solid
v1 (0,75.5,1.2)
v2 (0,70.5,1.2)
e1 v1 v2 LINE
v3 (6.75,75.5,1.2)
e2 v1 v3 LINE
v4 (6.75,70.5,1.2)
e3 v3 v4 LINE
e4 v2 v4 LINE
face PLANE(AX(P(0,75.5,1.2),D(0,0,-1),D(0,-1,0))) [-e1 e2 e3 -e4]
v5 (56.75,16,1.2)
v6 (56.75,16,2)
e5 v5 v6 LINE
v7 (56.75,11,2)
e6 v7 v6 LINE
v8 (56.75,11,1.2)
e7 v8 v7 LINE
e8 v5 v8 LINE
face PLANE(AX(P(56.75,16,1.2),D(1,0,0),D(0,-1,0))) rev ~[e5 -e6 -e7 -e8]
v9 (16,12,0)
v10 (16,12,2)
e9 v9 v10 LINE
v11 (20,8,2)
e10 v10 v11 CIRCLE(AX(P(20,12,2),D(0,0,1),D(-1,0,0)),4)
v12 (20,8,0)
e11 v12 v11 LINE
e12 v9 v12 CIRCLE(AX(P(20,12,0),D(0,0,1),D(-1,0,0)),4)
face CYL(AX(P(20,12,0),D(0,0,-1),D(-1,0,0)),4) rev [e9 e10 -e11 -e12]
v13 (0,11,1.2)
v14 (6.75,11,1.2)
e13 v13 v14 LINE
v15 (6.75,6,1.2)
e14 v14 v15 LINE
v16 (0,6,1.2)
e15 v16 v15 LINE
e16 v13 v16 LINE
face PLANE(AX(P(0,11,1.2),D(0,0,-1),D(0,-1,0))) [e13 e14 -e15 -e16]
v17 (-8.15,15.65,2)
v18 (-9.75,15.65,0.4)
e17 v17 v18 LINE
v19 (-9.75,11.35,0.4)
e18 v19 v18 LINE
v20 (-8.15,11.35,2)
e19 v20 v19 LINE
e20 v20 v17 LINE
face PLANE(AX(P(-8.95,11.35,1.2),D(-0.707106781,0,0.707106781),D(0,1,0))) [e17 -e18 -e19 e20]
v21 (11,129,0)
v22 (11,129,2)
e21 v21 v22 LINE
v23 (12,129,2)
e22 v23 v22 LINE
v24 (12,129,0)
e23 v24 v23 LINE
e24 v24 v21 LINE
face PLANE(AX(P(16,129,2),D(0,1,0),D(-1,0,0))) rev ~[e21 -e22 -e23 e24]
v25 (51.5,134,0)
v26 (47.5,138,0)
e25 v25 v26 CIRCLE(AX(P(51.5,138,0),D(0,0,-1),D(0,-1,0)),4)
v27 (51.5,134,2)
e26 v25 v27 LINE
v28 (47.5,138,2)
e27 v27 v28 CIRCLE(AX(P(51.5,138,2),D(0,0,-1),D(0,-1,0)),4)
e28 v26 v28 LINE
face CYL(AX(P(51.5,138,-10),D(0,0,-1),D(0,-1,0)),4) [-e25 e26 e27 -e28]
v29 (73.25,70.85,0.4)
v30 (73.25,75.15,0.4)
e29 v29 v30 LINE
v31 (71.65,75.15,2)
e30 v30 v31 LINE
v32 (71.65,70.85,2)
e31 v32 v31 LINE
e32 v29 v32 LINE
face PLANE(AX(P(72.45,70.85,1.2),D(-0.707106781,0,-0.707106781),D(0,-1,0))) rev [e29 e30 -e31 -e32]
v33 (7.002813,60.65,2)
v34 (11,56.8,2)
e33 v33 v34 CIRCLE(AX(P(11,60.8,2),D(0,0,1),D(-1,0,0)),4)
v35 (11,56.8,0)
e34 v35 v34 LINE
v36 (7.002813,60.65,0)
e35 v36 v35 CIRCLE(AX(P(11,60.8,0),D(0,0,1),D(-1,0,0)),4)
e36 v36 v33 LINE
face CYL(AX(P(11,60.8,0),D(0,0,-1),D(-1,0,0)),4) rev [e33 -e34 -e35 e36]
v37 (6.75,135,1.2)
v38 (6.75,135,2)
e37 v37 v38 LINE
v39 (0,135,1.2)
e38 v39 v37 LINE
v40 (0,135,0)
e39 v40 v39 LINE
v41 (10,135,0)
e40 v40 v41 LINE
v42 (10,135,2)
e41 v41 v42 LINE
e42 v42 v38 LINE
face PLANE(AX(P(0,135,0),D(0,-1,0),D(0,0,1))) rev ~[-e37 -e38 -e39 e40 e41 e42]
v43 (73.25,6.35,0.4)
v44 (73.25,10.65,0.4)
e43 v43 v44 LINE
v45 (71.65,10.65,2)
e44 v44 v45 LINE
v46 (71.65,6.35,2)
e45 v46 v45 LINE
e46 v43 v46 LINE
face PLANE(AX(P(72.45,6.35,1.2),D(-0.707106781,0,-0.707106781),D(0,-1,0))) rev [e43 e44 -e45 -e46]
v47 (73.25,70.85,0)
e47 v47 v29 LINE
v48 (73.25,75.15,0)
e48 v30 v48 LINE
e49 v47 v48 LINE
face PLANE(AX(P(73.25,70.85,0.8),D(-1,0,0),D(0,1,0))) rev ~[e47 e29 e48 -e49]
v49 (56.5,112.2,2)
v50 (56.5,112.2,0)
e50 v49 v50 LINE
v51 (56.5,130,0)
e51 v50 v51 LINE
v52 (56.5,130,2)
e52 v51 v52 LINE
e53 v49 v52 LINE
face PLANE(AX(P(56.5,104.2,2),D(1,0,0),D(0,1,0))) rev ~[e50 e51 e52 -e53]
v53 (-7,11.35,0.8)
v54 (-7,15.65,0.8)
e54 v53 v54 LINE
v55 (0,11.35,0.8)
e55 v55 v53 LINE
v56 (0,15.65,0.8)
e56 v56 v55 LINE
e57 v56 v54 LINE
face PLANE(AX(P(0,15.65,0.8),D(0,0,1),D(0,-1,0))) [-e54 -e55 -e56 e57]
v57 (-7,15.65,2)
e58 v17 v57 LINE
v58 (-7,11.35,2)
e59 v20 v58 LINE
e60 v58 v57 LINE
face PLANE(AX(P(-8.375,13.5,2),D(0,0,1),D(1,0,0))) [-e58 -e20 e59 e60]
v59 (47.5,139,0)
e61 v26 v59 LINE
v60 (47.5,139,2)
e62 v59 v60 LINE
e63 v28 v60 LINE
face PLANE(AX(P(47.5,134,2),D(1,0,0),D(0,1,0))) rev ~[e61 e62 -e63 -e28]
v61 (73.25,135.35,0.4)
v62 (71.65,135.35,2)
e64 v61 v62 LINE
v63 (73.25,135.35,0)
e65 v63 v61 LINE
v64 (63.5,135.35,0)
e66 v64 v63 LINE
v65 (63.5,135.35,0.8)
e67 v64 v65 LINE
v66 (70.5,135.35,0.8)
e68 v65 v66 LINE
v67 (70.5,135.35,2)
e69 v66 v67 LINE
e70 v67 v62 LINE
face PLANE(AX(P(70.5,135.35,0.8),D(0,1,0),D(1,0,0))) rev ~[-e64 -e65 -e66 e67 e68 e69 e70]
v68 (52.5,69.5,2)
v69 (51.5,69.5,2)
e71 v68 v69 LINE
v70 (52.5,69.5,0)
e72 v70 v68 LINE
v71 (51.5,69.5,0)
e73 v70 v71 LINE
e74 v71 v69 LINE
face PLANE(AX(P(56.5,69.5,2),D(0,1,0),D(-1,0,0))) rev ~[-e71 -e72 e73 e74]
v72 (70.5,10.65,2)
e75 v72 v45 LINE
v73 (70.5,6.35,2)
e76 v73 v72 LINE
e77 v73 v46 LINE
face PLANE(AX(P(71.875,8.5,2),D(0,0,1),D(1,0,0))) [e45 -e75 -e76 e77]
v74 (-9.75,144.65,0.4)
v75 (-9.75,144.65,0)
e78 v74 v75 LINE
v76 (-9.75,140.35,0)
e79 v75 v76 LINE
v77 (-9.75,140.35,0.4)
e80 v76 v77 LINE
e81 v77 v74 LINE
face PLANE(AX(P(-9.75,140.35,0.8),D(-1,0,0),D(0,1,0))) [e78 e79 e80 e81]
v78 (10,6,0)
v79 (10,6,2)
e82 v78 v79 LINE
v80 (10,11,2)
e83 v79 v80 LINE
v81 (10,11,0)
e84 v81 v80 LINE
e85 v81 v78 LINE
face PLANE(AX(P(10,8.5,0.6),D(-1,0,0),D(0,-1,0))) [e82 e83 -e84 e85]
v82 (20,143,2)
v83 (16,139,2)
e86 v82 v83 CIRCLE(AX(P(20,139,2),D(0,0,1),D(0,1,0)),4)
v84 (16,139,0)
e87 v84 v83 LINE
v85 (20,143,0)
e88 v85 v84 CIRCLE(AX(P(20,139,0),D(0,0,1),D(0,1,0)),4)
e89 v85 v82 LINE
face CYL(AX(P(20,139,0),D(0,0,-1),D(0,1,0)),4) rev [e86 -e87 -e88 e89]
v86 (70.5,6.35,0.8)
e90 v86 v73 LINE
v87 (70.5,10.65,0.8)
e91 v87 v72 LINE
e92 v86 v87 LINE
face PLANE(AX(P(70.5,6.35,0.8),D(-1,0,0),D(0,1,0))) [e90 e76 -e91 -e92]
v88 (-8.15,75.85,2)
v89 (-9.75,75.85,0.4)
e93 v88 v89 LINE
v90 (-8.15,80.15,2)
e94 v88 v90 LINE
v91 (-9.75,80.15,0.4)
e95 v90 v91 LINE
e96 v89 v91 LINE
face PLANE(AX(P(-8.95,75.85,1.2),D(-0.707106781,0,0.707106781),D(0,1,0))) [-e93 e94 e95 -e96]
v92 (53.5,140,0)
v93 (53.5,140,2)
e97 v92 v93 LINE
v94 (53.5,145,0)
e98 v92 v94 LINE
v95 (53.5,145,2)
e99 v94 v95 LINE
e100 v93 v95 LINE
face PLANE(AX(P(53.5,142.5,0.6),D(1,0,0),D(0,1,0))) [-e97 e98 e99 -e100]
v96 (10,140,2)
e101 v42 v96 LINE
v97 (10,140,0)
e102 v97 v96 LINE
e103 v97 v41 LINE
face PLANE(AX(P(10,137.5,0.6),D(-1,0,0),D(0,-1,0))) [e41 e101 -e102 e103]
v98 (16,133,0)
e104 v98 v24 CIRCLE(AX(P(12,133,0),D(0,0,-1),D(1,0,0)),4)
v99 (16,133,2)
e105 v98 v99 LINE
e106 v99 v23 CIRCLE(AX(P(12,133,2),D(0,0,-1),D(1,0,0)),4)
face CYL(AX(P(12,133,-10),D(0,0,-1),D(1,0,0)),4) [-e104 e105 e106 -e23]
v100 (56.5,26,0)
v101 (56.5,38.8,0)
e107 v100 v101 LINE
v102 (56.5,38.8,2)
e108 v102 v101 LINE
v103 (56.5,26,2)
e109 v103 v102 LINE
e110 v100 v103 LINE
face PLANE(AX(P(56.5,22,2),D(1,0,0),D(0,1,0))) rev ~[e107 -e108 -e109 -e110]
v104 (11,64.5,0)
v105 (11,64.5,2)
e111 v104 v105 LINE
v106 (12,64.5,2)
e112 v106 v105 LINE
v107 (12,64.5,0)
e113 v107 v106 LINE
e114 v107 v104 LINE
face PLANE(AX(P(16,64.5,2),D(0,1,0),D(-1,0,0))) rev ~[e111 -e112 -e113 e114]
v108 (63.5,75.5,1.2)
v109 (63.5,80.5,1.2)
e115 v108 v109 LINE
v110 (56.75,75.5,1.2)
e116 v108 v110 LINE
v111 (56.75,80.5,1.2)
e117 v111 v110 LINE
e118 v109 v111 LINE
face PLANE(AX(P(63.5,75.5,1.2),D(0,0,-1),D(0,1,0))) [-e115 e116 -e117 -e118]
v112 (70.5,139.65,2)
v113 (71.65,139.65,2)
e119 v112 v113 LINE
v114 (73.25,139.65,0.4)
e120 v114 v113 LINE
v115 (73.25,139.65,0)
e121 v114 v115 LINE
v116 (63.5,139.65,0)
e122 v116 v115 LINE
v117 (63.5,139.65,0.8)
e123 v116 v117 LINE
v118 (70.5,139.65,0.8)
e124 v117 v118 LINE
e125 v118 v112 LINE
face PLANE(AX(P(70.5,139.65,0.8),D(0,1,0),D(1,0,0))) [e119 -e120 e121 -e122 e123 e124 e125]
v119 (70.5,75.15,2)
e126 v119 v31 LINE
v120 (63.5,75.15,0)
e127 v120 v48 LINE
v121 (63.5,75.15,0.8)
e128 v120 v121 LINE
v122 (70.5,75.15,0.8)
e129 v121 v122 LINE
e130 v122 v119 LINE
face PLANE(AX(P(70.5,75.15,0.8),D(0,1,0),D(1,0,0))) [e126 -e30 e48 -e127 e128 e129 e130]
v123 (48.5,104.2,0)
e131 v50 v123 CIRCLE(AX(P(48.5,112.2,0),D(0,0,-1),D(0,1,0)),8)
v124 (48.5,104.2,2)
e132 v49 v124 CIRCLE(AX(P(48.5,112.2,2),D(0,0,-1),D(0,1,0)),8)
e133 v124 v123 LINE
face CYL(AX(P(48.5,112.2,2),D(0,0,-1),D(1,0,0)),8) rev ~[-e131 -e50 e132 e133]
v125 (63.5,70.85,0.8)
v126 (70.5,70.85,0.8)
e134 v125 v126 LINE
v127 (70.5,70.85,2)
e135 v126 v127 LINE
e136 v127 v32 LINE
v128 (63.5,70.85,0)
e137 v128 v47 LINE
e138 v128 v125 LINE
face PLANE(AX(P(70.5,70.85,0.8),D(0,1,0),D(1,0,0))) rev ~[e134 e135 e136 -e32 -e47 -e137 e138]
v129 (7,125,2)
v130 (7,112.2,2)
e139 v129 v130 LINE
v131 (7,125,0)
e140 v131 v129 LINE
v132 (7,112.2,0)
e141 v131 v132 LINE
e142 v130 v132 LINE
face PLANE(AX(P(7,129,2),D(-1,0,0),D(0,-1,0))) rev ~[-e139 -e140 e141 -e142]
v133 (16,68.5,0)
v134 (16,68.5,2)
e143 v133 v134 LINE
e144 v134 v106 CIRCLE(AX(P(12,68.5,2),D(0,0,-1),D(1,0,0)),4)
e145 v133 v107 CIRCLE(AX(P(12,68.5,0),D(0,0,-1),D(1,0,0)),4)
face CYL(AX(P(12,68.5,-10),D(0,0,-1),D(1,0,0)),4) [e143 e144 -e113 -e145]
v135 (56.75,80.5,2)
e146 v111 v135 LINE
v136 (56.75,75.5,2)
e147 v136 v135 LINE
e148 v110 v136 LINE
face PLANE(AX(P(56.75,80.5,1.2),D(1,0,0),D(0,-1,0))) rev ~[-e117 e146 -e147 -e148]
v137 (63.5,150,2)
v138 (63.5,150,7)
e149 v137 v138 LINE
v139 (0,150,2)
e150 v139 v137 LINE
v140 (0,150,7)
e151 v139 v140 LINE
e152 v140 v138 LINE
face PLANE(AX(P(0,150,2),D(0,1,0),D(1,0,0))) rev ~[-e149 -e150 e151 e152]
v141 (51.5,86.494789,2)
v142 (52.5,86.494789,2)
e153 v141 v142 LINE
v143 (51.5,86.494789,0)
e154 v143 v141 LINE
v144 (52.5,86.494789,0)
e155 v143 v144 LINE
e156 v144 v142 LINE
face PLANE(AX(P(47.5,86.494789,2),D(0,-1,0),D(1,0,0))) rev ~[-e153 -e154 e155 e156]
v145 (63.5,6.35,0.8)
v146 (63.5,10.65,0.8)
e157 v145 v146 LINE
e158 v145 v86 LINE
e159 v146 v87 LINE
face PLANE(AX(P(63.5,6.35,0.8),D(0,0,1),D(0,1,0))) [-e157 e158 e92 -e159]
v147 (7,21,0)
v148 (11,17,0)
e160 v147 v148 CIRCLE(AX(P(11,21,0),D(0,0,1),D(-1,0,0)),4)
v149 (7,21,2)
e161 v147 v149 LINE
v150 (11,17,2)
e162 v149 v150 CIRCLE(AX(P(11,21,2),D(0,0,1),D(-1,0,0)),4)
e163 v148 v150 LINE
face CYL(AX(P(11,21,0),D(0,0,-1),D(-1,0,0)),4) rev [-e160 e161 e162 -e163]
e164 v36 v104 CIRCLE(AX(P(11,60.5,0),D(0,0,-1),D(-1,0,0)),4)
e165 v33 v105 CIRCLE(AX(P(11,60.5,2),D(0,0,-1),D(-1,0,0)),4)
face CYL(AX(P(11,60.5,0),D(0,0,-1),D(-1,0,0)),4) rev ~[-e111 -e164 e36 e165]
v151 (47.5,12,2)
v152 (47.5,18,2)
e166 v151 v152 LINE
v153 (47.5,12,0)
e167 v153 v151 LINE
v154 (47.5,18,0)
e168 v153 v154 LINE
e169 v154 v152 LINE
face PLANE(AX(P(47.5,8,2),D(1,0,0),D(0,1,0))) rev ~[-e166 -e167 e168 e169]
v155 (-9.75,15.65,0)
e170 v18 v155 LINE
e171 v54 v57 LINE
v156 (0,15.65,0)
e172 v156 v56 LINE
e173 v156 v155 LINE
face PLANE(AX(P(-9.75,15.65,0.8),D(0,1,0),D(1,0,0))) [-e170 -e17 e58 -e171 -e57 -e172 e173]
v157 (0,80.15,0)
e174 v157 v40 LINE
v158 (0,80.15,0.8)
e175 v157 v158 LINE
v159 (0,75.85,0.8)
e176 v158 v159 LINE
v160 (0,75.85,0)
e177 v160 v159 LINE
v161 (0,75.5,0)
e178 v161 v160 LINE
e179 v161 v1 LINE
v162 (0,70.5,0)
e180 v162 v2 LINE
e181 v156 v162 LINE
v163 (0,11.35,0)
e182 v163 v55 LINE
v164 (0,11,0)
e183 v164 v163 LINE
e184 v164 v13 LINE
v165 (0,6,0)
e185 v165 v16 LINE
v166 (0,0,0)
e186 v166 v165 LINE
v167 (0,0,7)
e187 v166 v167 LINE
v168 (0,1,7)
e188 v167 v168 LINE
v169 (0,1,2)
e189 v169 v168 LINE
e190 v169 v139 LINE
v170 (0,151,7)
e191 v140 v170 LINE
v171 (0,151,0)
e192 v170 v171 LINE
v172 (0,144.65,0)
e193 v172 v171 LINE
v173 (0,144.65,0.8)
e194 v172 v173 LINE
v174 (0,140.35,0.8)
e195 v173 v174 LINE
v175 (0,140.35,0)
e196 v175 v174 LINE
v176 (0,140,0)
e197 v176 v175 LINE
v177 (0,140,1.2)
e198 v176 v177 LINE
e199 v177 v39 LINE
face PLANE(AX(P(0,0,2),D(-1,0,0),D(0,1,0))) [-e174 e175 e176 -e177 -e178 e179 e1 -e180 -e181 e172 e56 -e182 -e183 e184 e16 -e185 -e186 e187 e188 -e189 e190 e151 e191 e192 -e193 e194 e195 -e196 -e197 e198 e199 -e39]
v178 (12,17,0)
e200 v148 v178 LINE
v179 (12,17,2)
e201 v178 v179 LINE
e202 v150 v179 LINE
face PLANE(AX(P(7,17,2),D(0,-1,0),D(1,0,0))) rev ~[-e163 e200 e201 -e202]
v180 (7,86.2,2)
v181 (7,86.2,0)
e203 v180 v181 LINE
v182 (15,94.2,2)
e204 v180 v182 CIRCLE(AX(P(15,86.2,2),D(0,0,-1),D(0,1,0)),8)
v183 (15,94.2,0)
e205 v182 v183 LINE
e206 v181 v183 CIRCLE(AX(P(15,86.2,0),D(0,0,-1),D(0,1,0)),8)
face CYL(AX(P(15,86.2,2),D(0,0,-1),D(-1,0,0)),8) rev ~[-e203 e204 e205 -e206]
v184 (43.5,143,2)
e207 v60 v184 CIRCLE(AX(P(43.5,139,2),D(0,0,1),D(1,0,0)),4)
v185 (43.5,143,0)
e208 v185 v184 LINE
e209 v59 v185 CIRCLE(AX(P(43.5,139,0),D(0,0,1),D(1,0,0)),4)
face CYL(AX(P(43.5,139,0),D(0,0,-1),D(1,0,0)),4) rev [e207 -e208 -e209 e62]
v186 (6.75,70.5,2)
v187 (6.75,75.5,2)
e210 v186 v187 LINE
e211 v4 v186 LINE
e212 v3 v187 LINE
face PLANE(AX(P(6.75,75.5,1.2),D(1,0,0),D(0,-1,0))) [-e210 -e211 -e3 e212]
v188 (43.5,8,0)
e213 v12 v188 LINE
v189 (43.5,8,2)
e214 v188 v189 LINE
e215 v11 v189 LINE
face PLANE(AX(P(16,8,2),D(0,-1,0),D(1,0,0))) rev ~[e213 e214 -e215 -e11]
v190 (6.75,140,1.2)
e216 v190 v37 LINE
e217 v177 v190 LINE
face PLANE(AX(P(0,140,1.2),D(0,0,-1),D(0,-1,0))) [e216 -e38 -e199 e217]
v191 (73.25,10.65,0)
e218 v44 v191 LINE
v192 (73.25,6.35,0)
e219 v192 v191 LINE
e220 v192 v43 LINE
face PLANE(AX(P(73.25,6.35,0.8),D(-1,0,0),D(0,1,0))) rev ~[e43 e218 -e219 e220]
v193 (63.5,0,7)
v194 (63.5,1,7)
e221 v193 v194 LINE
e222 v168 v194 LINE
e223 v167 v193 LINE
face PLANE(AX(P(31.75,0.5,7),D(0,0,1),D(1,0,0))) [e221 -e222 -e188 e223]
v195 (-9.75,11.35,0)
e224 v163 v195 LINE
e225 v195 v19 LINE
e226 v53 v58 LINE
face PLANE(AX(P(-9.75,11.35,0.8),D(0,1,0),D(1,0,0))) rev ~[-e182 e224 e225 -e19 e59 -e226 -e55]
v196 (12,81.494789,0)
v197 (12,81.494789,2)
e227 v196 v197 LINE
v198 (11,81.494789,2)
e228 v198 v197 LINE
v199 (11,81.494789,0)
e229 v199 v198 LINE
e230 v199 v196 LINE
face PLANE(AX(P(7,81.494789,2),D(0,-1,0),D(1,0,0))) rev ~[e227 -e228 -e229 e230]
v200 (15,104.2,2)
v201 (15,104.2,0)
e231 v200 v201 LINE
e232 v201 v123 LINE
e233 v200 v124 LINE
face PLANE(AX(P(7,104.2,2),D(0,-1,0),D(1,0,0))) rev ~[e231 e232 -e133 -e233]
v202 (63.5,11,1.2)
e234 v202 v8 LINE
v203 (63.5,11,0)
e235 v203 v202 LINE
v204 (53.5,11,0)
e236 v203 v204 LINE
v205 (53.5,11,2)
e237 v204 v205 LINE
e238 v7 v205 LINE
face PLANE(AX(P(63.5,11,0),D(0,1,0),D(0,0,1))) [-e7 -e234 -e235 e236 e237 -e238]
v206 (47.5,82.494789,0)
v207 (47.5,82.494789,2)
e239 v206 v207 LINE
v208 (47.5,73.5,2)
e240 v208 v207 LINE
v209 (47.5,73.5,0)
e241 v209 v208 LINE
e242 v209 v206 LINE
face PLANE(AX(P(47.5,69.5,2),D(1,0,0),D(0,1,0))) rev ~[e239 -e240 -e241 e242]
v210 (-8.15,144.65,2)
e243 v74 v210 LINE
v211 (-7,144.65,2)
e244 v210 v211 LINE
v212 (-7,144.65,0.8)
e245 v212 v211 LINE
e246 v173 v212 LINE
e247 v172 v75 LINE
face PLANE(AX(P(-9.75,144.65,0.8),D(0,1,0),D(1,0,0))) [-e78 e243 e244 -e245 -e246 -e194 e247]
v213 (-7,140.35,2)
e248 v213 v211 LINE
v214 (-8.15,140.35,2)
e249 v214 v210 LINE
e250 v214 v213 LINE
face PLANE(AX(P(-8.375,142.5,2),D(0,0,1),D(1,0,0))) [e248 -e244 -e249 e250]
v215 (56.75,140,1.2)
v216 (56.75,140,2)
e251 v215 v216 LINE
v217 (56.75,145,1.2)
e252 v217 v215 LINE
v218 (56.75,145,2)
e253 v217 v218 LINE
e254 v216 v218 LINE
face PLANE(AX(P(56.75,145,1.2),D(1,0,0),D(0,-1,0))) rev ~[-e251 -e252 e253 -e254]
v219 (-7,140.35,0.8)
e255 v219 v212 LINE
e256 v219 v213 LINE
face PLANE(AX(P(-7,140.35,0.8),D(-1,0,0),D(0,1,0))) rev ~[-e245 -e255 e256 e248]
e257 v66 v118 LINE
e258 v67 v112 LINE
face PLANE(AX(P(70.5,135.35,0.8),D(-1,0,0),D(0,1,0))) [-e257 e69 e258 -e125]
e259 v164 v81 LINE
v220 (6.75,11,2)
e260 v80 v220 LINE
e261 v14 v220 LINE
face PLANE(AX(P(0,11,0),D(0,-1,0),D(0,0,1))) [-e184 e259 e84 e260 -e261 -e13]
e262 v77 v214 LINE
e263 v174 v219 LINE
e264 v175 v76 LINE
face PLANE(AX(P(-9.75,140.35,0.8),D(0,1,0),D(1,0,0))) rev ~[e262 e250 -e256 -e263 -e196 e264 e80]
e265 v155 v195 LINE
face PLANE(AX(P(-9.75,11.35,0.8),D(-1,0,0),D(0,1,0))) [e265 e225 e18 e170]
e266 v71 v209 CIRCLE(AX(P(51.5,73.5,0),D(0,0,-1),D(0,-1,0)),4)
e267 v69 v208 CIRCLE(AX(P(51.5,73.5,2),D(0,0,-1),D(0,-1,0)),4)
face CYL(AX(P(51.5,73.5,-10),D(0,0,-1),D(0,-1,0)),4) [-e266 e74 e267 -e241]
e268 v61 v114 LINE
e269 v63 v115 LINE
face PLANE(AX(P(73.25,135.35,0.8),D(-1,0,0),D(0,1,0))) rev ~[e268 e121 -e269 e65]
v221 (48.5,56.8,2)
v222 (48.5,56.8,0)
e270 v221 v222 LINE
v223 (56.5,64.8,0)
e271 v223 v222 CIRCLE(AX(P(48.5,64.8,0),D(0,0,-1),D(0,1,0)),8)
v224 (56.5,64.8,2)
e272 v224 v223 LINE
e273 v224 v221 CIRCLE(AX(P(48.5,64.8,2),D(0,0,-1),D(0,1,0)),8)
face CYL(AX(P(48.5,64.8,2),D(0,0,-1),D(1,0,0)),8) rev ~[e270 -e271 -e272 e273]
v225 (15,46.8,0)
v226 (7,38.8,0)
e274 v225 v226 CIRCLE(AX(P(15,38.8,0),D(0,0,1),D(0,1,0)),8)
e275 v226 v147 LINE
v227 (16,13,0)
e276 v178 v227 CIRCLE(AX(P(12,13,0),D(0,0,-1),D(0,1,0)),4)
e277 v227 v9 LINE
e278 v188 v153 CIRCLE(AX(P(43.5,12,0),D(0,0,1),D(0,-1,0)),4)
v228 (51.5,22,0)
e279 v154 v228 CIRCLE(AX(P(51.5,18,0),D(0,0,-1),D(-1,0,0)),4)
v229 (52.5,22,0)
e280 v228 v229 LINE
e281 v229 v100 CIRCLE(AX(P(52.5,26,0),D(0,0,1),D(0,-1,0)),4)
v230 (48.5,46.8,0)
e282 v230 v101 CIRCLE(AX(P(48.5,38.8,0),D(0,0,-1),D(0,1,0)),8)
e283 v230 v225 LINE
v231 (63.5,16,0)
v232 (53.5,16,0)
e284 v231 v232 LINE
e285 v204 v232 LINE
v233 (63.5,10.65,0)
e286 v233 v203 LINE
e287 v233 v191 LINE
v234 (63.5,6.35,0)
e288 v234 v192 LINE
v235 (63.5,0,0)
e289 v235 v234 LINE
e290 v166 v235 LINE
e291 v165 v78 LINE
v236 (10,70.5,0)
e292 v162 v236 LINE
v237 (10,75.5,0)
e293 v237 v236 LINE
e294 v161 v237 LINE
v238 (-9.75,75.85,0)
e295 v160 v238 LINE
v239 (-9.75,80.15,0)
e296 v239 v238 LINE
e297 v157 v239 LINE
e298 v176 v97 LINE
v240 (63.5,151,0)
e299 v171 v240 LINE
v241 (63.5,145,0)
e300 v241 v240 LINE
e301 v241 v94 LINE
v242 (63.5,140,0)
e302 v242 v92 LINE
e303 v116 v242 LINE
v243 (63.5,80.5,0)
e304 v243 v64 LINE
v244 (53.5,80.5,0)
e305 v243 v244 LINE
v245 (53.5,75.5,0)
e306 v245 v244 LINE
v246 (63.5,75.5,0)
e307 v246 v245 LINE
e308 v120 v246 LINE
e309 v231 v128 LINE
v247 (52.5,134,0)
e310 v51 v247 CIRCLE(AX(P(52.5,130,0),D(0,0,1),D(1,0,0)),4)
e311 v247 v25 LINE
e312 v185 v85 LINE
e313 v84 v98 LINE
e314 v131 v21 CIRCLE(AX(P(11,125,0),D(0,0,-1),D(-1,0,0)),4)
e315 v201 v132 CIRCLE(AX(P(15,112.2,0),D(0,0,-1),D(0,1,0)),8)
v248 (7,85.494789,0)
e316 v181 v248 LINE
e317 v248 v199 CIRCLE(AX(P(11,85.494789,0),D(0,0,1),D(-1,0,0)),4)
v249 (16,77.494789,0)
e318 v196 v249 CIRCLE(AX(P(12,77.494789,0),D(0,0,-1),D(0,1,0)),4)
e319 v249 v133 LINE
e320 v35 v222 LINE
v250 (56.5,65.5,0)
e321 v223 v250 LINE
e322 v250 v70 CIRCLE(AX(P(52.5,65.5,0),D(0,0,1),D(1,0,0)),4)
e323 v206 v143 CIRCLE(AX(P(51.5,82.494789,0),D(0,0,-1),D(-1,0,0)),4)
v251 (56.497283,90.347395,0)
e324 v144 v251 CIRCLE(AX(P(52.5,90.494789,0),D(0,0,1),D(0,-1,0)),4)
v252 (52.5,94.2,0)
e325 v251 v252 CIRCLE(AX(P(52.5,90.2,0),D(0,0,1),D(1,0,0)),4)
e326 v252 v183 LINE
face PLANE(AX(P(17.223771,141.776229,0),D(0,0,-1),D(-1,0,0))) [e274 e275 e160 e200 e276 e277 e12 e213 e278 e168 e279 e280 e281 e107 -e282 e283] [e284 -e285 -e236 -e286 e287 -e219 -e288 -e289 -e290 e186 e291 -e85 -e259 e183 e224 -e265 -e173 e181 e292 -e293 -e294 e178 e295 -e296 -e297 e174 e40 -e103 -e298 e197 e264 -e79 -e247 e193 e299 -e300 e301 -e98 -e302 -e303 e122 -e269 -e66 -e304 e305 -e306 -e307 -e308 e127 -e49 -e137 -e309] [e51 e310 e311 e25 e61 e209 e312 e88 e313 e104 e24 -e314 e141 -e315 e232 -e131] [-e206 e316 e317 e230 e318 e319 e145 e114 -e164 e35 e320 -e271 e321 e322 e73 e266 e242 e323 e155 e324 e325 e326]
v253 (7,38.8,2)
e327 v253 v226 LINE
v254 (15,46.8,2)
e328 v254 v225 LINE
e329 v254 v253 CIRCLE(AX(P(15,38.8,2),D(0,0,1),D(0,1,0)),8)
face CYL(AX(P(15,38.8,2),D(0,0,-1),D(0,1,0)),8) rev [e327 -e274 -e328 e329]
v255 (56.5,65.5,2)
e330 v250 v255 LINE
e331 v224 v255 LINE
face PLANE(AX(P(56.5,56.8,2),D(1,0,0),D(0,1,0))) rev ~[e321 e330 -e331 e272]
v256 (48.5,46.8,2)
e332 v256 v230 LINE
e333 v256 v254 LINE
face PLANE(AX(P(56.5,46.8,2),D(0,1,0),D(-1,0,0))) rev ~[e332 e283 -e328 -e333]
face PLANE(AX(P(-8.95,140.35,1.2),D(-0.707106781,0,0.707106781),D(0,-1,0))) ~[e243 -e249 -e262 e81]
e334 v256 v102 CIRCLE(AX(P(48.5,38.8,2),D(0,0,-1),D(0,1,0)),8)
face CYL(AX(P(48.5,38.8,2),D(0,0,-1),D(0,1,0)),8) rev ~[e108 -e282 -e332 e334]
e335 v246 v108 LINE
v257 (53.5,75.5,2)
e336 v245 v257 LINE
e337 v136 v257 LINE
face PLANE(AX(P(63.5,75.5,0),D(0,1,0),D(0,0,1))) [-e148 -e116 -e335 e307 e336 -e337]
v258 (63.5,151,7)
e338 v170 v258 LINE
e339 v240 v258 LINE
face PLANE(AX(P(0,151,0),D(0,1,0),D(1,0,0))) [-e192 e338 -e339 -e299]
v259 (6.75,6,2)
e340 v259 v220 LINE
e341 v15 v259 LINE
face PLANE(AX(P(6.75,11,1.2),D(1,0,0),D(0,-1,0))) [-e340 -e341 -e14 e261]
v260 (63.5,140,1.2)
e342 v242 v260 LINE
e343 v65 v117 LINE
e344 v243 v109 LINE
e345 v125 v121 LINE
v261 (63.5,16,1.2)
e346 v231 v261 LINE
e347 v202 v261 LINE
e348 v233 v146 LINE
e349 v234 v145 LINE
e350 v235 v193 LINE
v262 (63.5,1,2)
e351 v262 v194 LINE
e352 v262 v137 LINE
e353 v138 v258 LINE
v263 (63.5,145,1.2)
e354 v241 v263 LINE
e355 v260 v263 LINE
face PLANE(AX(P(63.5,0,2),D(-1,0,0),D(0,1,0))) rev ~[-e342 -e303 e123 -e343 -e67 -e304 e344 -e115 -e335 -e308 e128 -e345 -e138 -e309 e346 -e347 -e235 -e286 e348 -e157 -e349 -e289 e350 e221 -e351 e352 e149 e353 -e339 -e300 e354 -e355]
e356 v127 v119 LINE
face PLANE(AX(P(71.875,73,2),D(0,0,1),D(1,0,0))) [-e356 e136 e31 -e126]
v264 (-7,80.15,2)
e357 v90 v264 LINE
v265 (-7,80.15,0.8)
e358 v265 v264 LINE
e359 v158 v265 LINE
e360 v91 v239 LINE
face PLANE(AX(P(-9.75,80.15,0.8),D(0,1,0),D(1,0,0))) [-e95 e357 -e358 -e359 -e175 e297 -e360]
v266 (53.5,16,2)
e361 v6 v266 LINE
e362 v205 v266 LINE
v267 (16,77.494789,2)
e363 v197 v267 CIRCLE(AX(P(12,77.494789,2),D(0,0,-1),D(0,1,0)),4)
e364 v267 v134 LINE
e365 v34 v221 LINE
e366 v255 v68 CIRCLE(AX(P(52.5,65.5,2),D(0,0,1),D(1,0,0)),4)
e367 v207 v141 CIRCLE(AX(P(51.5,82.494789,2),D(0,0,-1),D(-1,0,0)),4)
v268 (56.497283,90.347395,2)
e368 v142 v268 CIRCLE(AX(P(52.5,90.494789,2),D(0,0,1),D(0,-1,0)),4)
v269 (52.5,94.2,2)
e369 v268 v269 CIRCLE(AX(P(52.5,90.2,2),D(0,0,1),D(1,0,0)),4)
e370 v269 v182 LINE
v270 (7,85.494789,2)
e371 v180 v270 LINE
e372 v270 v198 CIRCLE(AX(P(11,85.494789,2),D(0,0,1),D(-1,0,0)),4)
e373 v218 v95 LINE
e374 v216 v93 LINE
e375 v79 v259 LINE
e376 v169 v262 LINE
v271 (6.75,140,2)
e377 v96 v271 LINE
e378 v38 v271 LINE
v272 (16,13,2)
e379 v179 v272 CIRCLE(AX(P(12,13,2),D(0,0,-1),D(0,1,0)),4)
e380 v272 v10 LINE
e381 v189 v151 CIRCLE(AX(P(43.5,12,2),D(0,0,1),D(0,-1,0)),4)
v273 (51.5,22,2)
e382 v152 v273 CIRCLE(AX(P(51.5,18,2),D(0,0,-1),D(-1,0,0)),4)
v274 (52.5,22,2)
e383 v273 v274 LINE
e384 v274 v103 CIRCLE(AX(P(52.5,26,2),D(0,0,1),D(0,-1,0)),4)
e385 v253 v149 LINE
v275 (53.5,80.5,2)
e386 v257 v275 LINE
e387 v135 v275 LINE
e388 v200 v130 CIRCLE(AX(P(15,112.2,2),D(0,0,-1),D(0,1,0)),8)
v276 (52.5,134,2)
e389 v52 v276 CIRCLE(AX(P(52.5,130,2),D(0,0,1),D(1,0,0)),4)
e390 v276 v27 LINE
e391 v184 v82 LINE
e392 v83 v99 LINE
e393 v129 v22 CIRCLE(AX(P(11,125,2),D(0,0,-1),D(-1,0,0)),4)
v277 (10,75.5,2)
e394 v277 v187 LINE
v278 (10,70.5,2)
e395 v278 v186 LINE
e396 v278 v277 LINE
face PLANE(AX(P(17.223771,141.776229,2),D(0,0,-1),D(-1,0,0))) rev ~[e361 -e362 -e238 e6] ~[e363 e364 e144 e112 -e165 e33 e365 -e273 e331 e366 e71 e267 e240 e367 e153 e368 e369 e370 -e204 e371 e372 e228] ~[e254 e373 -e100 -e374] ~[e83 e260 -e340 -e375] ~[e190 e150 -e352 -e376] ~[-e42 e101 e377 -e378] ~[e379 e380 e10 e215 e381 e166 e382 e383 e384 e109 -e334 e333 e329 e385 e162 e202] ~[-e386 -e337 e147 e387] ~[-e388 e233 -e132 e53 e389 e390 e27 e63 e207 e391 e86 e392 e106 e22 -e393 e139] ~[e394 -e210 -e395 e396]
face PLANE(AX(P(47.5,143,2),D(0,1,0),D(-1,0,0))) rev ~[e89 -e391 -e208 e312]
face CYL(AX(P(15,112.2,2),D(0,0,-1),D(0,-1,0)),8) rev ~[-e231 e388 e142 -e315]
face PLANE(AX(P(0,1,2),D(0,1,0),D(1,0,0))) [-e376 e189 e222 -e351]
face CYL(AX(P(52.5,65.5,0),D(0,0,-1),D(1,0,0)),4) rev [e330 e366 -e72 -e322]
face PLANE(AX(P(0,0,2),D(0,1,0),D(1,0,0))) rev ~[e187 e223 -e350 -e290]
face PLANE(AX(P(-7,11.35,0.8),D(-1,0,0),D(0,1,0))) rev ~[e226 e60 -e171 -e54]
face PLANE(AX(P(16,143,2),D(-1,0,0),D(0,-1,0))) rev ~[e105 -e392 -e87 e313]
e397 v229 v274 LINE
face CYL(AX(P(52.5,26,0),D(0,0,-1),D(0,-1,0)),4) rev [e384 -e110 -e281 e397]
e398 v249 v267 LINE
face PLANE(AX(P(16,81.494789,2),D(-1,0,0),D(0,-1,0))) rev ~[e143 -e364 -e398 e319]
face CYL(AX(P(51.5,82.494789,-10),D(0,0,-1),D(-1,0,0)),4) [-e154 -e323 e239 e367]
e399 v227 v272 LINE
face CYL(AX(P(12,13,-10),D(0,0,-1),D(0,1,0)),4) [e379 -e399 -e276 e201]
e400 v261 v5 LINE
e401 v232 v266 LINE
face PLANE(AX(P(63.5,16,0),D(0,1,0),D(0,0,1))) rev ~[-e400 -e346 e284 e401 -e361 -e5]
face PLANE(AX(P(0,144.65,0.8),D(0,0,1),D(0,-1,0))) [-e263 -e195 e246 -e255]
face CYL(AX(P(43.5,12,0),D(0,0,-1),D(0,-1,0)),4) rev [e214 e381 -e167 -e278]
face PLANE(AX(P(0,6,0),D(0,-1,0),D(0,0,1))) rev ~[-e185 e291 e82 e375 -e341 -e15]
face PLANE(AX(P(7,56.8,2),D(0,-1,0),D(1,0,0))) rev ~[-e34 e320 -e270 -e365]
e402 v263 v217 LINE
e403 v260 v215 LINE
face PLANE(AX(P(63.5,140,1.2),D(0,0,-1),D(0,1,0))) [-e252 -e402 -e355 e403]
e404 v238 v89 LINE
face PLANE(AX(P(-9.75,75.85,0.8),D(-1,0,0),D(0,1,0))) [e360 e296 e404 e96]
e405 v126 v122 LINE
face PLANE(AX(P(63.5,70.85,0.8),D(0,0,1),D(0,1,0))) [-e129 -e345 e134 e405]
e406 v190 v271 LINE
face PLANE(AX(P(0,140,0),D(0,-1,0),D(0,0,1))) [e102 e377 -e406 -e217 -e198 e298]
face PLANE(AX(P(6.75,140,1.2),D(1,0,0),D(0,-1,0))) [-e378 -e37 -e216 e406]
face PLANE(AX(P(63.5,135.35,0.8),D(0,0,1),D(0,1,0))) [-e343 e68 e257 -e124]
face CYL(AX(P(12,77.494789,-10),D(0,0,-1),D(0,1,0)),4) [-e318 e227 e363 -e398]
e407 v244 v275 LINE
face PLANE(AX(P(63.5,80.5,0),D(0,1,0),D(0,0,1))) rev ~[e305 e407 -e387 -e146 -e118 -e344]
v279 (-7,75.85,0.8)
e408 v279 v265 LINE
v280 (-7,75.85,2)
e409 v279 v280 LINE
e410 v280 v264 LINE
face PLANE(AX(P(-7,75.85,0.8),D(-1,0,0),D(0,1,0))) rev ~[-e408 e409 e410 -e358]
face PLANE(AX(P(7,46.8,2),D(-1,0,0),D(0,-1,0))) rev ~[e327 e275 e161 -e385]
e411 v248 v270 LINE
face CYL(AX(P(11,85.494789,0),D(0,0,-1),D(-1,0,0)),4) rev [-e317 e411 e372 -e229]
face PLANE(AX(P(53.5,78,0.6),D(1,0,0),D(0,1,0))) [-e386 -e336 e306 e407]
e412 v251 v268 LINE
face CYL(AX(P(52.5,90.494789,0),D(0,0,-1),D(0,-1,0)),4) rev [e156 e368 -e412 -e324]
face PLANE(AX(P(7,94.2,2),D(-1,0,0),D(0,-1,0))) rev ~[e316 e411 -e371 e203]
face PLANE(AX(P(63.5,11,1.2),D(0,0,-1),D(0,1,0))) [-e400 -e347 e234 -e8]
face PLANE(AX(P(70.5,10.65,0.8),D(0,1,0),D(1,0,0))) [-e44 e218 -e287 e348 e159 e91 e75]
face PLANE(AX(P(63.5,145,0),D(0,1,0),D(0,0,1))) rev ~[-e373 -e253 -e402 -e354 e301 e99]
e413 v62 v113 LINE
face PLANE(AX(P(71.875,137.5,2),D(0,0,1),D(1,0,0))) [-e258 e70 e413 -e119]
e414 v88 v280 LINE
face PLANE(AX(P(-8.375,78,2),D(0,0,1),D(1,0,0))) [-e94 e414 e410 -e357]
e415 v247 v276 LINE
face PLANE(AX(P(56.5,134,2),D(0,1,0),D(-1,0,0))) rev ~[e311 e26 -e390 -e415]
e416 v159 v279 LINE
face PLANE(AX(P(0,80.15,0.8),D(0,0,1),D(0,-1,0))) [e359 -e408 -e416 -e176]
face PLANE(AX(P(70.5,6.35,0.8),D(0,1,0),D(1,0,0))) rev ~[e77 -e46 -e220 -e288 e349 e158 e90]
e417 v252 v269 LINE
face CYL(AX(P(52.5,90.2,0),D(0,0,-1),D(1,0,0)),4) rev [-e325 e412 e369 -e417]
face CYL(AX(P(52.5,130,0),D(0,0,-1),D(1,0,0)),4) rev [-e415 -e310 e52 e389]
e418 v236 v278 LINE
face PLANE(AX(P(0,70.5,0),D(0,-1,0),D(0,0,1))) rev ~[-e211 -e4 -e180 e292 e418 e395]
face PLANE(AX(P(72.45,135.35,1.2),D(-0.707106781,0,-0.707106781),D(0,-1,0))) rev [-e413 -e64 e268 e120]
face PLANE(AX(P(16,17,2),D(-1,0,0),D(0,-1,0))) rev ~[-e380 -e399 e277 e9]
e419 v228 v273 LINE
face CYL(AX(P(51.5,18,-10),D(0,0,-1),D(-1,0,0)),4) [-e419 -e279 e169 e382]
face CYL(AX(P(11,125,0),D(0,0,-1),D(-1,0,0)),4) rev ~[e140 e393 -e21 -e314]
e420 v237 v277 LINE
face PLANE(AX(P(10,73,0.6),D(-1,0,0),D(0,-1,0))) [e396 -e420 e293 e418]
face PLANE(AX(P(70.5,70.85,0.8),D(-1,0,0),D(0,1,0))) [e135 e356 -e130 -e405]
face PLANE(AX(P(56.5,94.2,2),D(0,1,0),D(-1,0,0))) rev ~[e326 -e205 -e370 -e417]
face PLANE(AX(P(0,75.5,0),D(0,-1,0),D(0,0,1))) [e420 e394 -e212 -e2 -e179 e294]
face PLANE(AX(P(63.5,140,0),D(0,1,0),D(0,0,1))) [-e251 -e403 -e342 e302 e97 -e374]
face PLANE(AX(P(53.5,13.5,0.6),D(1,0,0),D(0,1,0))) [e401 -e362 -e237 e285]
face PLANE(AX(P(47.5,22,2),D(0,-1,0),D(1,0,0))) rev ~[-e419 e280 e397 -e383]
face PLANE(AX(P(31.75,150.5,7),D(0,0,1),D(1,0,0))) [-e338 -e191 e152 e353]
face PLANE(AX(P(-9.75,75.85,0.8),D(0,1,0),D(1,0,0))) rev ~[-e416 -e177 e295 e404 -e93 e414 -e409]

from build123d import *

# Parameters (mm, degrees)
F0_W         = 63.5
F0_H         = 151
F1_DEPTH     = 2
F2_W         = 63.5
F2_H         = 1
F3_DEPTH     = 5
F4_W         = 5
F4_H         = 1.2
F5_DEPTH     = 10
F6_W         = 5
F6_H         = 1.2
F7_DEPTH     = 10
F8_W         = 4.3
F8_H         = 0.8
F9_DEPTH     = 9.75
F10_W        = 4.3
F10_H        = 0.8
F11_DEPTH    = 9.75
F12_W        = 2.75
F12_H        = 4.3
F13_DEPTH    = 1.2
F14_W        = 2.75
F14_H        = 4.3
F15_DEPTH    = 1.2
F16_W        = 2.75
F16_H        = 4.3
F17_DEPTH    = 1.2
F18_W        = 2.75
F18_H        = 4.3
F19_DEPTH    = 1.2
F20_W        = 2.75
F20_H        = 4.3
F21_DEPTH    = 1.2
F22_W        = 2.75
F22_H        = 4.3
F23_DEPTH    = 1.2
F28_W        = 3.25
F28_H        = 5
F29_W        = 3.25
F29_H        = 5
F27_W        = 3.25
F27_H        = 5
F26_W        = 3.25
F26_H        = 5
F25_W        = 3.25
F25_H        = 5
F24_W        = 3.25
F24_H        = 5
F30_DEPTH    = 5.801
F31_SIZE     = 1.6
F33_DEPTH    = 2.001
F34_T1_DEPTH = 2
F34_T3_DEPTH = 22
F35_R        = 8


# Not quite as in the source:
# - a fillet or chamfer that OpenCascade refuses, or shapes differently, is made with other operations: its cross-section is extruded or revolved along the edge and cut away or added


with BuildPart() as f1:
    # F0 (on Top) → F1 (new body)
    with BuildSketch(Plane.XY):
        with Locations((31.75, 75.5)):
            Rectangle(F0_W, F0_H)
    extrude(amount=F1_DEPTH)

    # F2 (on face) → F3 (join)
    with BuildSketch(Plane.XY.offset(2)):
        with Locations((31.75, 0.5)):
            Rectangle(F2_W, F2_H)
        with Locations((31.75, 150.5)):
            Rectangle(F2_W, F2_H)
    extrude(amount=F3_DEPTH)

    # F4 (on face) → F5 (cut)
    with BuildSketch(Plane.YZ.offset(63.5)):
        with Locations((13.5, 0.6)):
            Rectangle(F4_W, F4_H)
        with Locations((78, 0.6)):
            Rectangle(F4_W, F4_H)
        with Locations((142.5, 0.6)):
            Rectangle(F4_W, F4_H)
    extrude(amount=-F5_DEPTH, mode=Mode.SUBTRACT)

    # F6 (on face) → F7 (cut)
    with BuildSketch(Plane(origin=(0, 0, 0), x_dir=(0, -1, 0), z_dir=(-1, 0, 0))):
        with Locations((-137.5, 0.6)):
            Rectangle(F6_W, F6_H)
        with Locations((-73, 0.6)):
            Rectangle(F6_W, F6_H)
        with Locations((-8.5, 0.6)):
            Rectangle(F6_W, F6_H)
    extrude(amount=-F7_DEPTH, mode=Mode.SUBTRACT)

    # F8 (on face) → F9 (join)
    with BuildSketch(Plane.YZ.offset(63.5)):
        with Locations((137.5, 0.4)):
            Rectangle(F8_W, F8_H)
        with Locations((73, 0.4)):
            Rectangle(F8_W, F8_H)
        with Locations((8.5, 0.4)):
            Rectangle(F8_W, F8_H)
    extrude(amount=F9_DEPTH)

    # F10 (on face) → F11 (join)
    with BuildSketch(Plane(origin=(0, 0, 0), x_dir=(0, -1, 0), z_dir=(-1, 0, 0))):
        with Locations((-13.5, 0.4)):
            Rectangle(F10_W, F10_H)
        with Locations((-78, 0.4)):
            Rectangle(F10_W, F10_H)
        with Locations((-142.5, 0.4)):
            Rectangle(F10_W, F10_H)
    extrude(amount=F11_DEPTH)

    # F12 (on face) → F13 (join)
    with BuildSketch(Plane.XY.offset(0.8)):
        with Locations((71.875, 8.5)):
            Rectangle(F12_W, F12_H)
    extrude(amount=F13_DEPTH)

    # F14 (on face) → F15 (join)
    with BuildSketch(Plane.XY.offset(0.8)):
        with Locations((-8.375, 13.5)):
            Rectangle(F14_W, F14_H)
    extrude(amount=F15_DEPTH)

    # F16 (on face) → F17 (join)
    with BuildSketch(Plane.XY.offset(0.8)):
        with Locations((71.875, 73)):
            Rectangle(F16_W, F16_H)
    extrude(amount=F17_DEPTH)

    # F18 (on face) → F19 (join)
    with BuildSketch(Plane.XY.offset(0.8)):
        with Locations((-8.375, 78)):
            Rectangle(F18_W, F18_H)
    extrude(amount=F19_DEPTH)

    # F20 (on face) → F21 (join)
    with BuildSketch(Plane.XY.offset(0.8)):
        with Locations((71.875, 137.5)):
            Rectangle(F20_W, F20_H)
    extrude(amount=F21_DEPTH)

    # F22 (on face) → F23 (join)
    with BuildSketch(Plane.XY.offset(0.8)):
        with Locations((-8.375, 142.5)):
            Rectangle(F22_W, F22_H)
    extrude(amount=F23_DEPTH)

    # F28 (on face) + F29 (on face) + F27 (on face) + F26 (on face) + F25 (on face) + F24 (on face) → F30 (cut, through all)
    with BuildSketch(Plane(origin=(0, 0, 1.2), x_dir=(1, 0, 0), z_dir=(0, 0, -1))):
        with Locations((55.125, -13.5)):
            Rectangle(F28_W, F28_H)
    with BuildSketch(Plane(origin=(0, 0, 1.2), x_dir=(1, 0, 0), z_dir=(0, 0, -1))):
        with Locations((8.375, -8.5)):
            Rectangle(F29_W, F29_H)
    with BuildSketch(Plane(origin=(0, 0, 1.2), x_dir=(1, 0, 0), z_dir=(0, 0, -1))):
        with Locations((8.375, -73)):
            Rectangle(F27_W, F27_H)
    with BuildSketch(Plane(origin=(0, 0, 1.2), x_dir=(1, 0, 0), z_dir=(0, 0, -1))):
        with Locations((55.125, -78)):
            Rectangle(F26_W, F26_H)
    with BuildSketch(Plane(origin=(0, 0, 1.2), x_dir=(1, 0, 0), z_dir=(0, 0, -1))):
        with Locations((8.375, -137.5)):
            Rectangle(F25_W, F25_H)
    with BuildSketch(Plane(origin=(0, 0, 1.2), x_dir=(1, 0, 0), z_dir=(0, 0, -1))):
        with Locations((55.125, -142.5)):
            Rectangle(F24_W, F24_H)
    extrude(amount=-F30_DEPTH, mode=Mode.SUBTRACT)

    # F31
    f31_edges = [f1.edges().sort_by_distance(p)[0] for p in [
        (73.25, 8.5, 2),
        (73.25, 73, 2),
        (73.25, 137.5, 2),
        (-9.75, 142.5, 2),
        (-9.75, 78, 2),
        (-9.75, 13.5, 2),
    ]]
    chamfer(f31_edges, length=F31_SIZE)

    # F32 (on face) → F33 (cut, through all)
    with BuildSketch(Plane.XY.offset(2)):
        Polygon((7, 129), (7, 104.2), (56.5, 104.2), (56.5, 134), (47.5, 134), (47.5, 143), (16, 143), (16, 129), align=None)
        Polygon((7, 64.5), (7, 56.8), (56.5, 56.8), (56.5, 69.5), (47.5, 69.5), (47.5, 86.4947894041), (56.5, 86.4947894041), (56.5, 94.2), (7, 94.2), (7, 81.4947894041), (16, 81.4947894041), (16, 64.5), align=None)
        Polygon((7, 46.8), (7, 17), (16, 17), (16, 8), (47.5, 8), (47.5, 22), (56.5, 22), (56.5, 46.8), align=None)
    extrude(amount=-F33_DEPTH, mode=Mode.SUBTRACT)

    # F34: fillet of radius 4 on 22 edges, made by hand

    # F34_s2 → F34_t1 (join)
    with BuildSketch(Plane.XY):
        with BuildLine():
            ThreePointArc((20, 143), (17.1715728753, 141.8284271247), (16, 139))
            Line((16, 139), (16, 143))
            Line((16, 143), (20, 143))
        make_face()
        with BuildLine():
            ThreePointArc((7, 125), (8.1715728753, 127.8284271247), (11, 129))
            Line((11, 129), (7, 129))
            Line((7, 129), (7, 125))
        make_face()
        with BuildLine():
            ThreePointArc((7, 60.5), (8.1715728753, 63.3284271247), (11, 64.5))
            Line((11, 64.5), (7, 64.5))
            Line((7, 64.5), (7, 60.5))
        make_face()
        with BuildLine():
            ThreePointArc((52.5, 86.4947894041), (55.3284271247, 87.6663622794), (56.5, 90.4947894041))
            Line((56.5, 90.4947894041), (56.5, 86.4947894041))
            Line((56.5, 86.4947894041), (52.5, 86.4947894041))
        make_face()
        with BuildLine():
            ThreePointArc((52.5, 22), (55.3284271247, 23.1715728753), (56.5, 26))
            Line((56.5, 26), (56.5, 22))
            Line((56.5, 22), (52.5, 22))
        make_face()
        with BuildLine():
            ThreePointArc((43.5, 8), (46.3284271247, 9.1715728753), (47.5, 12))
            Line((47.5, 12), (47.5, 8))
            Line((47.5, 8), (43.5, 8))
        make_face()
        with BuildLine():
            ThreePointArc((56.5, 65.5), (55.3284271247, 68.3284271247), (52.5, 69.5))
            Line((52.5, 69.5), (56.5, 69.5))
            Line((56.5, 69.5), (56.5, 65.5))
        make_face()
        with BuildLine():
            ThreePointArc((56.5, 130), (55.3284271247, 132.8284271247), (52.5, 134))
            Line((52.5, 134), (56.5, 134))
            Line((56.5, 134), (56.5, 130))
        make_face()
        with BuildLine():
            ThreePointArc((47.5, 139), (46.3284271247, 141.8284271247), (43.5, 143))
            Line((43.5, 143), (47.5, 143))
            Line((47.5, 143), (47.5, 139))
        make_face()
        with BuildLine():
            ThreePointArc((7, 85.4947894041), (8.1715728753, 82.6663622794), (11, 81.4947894041))
            Line((11, 81.4947894041), (7, 81.4947894041))
            Line((7, 81.4947894041), (7, 85.4947894041))
        make_face()
        with BuildLine():
            ThreePointArc((7, 21), (8.1715728753, 18.1715728753), (11, 17))
            Line((11, 17), (7, 17))
            Line((7, 17), (7, 21))
        make_face()
        with BuildLine():
            ThreePointArc((7, 60.8), (8.1715728753, 57.9715728753), (11, 56.8))
            Line((11, 56.8), (7, 56.8))
            Line((7, 56.8), (7, 60.8))
        make_face()
        with BuildLine():
            ThreePointArc((56.5, 90.2), (55.3284271247, 93.0284271247), (52.5, 94.2))
            Line((52.5, 94.2), (56.5, 94.2))
            Line((56.5, 94.2), (56.5, 90.2))
        make_face()
        with BuildLine():
            ThreePointArc((16, 12), (17.1715728753, 9.1715728753), (20, 8))
            Line((20, 8), (16, 8))
            Line((16, 8), (16, 12))
        make_face()
    extrude(amount=F34_T1_DEPTH)

    # F34_s4 → F34_t3 (cut)
    with BuildSketch(Plane.XY.offset(-10)):
        with BuildLine():
            ThreePointArc((16, 133), (14.8284271247, 130.1715728753), (12, 129))
            Line((12, 129), (16, 129))
            Line((16, 129), (16, 133))
        make_face()
        with BuildLine():
            ThreePointArc((51.5, 134), (48.6715728753, 135.1715728753), (47.5, 138))
            Line((47.5, 138), (47.5, 134))
            Line((47.5, 134), (51.5, 134))
        make_face()
        with BuildLine():
            ThreePointArc((51.5, 69.5), (48.6715728753, 70.6715728753), (47.5, 73.5))
            Line((47.5, 73.5), (47.5, 69.5))
            Line((47.5, 69.5), (51.5, 69.5))
        make_face()
        with BuildLine():
            ThreePointArc((12, 81.4947894041), (14.8284271247, 80.3232165289), (16, 77.4947894041))
            Line((16, 77.4947894041), (16, 81.4947894041))
            Line((16, 81.4947894041), (12, 81.4947894041))
        make_face()
        with BuildLine():
            ThreePointArc((16, 68.5), (14.8284271247, 65.6715728753), (12, 64.5))
            Line((12, 64.5), (16, 64.5))
            Line((16, 64.5), (16, 68.5))
        make_face()
        with BuildLine():
            ThreePointArc((12, 17), (14.8284271247, 15.8284271247), (16, 13))
            Line((16, 13), (16, 17))
            Line((16, 17), (12, 17))
        make_face()
        with BuildLine():
            ThreePointArc((47.5, 82.4947894041), (48.6715728753, 85.3232165289), (51.5, 86.4947894041))
            Line((51.5, 86.4947894041), (47.5, 86.4947894041))
            Line((47.5, 86.4947894041), (47.5, 82.4947894041))
        make_face()
        with BuildLine():
            ThreePointArc((47.5, 18), (48.6715728753, 20.8284271247), (51.5, 22))
            Line((51.5, 22), (47.5, 22))
            Line((47.5, 22), (47.5, 18))
        make_face()
    extrude(amount=F34_T3_DEPTH, mode=Mode.SUBTRACT)

    # F35
    f35_edges = [f1.edges().sort_by_distance(p)[0] for p in [
        (7, 94.2, 1),
        (7, 46.8, 1),
        (56.5, 104.2, 1),
        (56.5, 56.8, 1),
        (7, 104.2, 1),
        (56.5, 46.8, 1),
    ]]
    fillet(f35_edges, radius=F35_R)


solid = f1.part
